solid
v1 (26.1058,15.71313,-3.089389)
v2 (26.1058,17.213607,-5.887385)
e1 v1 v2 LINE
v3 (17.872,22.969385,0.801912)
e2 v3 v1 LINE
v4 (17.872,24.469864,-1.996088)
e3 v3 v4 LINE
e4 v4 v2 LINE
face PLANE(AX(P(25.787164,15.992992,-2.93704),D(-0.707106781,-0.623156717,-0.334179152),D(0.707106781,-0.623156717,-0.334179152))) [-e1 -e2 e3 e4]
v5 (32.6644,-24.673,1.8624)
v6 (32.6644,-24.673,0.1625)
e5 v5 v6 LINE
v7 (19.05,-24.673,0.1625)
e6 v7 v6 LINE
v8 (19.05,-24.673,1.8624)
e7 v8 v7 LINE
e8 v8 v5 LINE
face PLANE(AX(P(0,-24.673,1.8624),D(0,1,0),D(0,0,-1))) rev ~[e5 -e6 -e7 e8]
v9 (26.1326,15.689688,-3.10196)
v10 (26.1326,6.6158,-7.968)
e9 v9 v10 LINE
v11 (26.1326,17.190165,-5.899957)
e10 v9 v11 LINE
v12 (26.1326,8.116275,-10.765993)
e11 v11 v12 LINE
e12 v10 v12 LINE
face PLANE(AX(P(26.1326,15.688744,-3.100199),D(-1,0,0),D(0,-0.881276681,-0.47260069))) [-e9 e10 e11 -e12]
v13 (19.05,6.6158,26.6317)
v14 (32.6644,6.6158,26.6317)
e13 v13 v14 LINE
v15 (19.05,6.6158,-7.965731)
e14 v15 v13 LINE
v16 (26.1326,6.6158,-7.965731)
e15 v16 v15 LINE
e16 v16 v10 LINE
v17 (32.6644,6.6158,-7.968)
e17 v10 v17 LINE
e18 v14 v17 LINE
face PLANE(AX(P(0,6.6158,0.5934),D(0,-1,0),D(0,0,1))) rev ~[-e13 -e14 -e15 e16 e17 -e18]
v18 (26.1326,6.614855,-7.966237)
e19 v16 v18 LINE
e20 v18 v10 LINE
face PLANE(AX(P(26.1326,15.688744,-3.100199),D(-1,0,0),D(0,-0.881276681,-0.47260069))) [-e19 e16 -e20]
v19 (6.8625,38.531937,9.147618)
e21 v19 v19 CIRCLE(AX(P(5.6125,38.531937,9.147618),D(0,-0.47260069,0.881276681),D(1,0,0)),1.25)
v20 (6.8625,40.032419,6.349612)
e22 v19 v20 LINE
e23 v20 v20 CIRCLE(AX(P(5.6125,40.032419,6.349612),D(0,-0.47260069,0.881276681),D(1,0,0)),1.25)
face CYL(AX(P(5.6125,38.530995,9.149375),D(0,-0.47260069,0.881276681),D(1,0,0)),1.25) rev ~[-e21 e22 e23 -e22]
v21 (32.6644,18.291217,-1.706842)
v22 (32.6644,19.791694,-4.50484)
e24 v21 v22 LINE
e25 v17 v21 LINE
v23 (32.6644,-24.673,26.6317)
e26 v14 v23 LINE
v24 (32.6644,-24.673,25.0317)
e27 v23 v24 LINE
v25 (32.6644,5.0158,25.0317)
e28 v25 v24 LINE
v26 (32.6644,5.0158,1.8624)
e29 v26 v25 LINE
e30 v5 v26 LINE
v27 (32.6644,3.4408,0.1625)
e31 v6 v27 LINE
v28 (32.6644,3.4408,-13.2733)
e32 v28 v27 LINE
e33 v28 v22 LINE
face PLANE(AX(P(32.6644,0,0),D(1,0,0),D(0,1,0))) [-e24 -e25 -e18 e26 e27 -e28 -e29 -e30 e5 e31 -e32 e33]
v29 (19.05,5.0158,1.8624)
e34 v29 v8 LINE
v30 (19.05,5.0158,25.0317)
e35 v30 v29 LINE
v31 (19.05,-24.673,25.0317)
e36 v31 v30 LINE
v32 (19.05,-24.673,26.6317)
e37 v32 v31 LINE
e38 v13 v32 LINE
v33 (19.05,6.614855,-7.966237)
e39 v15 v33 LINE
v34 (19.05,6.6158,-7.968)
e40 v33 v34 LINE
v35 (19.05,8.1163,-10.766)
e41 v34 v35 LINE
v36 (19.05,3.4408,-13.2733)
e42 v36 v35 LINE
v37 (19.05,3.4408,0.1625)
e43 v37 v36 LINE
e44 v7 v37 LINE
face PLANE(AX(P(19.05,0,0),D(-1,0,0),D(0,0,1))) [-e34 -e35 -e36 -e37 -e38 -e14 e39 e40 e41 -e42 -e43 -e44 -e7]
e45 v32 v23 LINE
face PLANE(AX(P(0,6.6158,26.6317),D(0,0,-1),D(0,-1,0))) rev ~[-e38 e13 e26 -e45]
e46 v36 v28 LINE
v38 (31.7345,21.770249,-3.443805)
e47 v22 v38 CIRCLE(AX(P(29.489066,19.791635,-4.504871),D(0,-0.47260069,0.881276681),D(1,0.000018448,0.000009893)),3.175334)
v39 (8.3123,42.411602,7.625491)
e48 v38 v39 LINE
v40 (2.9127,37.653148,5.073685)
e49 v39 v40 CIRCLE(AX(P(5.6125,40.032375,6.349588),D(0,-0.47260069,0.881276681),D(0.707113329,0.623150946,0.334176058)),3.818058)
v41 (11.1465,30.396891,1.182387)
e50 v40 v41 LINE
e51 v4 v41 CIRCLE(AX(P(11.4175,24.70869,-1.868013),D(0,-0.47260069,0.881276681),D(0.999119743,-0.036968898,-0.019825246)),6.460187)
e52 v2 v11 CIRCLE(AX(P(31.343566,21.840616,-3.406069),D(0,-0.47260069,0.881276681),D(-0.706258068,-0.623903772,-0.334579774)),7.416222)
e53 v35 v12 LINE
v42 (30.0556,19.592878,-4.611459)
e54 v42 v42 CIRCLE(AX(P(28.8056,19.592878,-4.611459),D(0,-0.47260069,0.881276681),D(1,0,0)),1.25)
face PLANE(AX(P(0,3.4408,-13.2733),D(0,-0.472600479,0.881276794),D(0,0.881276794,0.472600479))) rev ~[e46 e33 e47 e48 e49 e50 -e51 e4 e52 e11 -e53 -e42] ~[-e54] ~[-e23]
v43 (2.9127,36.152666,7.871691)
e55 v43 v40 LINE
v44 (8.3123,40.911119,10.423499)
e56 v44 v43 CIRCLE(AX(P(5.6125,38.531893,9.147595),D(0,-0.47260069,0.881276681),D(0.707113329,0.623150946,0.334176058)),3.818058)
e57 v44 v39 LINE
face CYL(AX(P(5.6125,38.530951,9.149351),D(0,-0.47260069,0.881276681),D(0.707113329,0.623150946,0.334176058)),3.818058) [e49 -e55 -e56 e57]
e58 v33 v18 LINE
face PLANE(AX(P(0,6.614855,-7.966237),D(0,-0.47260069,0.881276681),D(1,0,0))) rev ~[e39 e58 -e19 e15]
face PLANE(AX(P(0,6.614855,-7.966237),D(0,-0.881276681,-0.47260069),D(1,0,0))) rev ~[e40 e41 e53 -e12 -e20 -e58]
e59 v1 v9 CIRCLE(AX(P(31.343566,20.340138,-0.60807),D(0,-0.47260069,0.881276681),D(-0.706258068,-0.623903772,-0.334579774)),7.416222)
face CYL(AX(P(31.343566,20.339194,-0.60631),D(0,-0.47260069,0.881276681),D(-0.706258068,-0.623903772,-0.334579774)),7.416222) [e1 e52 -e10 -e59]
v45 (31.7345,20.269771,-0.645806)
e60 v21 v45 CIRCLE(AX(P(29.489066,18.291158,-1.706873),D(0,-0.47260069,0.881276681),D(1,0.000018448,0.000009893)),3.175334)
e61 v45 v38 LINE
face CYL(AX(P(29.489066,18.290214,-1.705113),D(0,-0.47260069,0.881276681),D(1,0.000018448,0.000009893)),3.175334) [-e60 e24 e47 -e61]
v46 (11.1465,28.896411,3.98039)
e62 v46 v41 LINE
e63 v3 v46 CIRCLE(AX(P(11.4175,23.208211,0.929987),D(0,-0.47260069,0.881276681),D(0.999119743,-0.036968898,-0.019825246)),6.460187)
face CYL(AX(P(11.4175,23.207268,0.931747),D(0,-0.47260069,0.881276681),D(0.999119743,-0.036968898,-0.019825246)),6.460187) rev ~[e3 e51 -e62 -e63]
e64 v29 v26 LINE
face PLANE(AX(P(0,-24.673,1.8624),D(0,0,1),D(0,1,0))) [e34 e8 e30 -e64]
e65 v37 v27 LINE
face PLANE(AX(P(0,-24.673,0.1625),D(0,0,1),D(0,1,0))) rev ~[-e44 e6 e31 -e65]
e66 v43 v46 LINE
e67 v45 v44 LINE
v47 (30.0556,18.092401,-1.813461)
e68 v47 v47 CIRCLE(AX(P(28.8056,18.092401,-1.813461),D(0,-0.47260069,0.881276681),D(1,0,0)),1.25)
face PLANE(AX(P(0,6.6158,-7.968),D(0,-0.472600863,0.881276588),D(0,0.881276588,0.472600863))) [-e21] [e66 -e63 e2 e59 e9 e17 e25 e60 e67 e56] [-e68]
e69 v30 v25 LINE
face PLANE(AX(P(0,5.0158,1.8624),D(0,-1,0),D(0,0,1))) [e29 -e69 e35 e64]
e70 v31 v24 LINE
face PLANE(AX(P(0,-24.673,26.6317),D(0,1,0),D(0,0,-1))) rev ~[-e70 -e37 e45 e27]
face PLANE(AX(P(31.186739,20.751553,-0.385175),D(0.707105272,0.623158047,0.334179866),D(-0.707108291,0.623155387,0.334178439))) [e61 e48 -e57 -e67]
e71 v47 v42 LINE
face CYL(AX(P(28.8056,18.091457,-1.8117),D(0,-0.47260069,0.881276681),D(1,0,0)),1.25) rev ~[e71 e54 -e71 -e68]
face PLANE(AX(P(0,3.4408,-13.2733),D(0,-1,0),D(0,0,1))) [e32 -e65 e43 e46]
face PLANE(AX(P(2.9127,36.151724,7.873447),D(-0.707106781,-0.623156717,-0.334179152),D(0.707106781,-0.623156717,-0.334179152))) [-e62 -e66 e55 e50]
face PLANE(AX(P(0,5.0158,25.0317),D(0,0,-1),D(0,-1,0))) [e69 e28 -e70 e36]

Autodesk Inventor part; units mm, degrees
ref_plane "YZ Plane" through (0, 0, 0) normal (1, 0, 0) x (0, 1, 0)
ref_plane "XZ Plane" through (0, 0, 0) normal (0, 1, 0) x (-1, 0, 0)
ref_plane "XY Plane" through (0, 0, 0) normal (0, 0, 1) x (1, 0, 0)
sketch "Sketch1" plane through (0, 0, 0) normal (1, 0, 0) x (0, 1, 0)
  line L0 (6.6158, 26.6317) -> (-24.673, 26.6317)
  line L1 (6.6158, 0.5934) -> (6.6158, 26.6317)
  line L2 (5.0158, 25.0317) -> (-24.673, 25.0317)
  line L3 (-24.673, 1.8624) -> (5.0158, 1.8624)
  line L4 (5.0158, 1.8624) -> (5.0158, 25.0317)
  line L5 (-24.673, 26.6317) -> (-24.673, 25.0317)
  line L6 (-24.673, 1.8624) -> (-24.673, 0.1625)
  line L7 (-24.6286, 24.997) -> (4.9714, 24.997) construction
  line L8 (4.9714, 24.997) -> (4.9714, 1.897) construction
  line L9 (4.9714, 1.897) -> (-24.6286, 1.897) construction
  line L10 (-24.6286, 1.897) -> (-24.6286, 24.997) construction
  line L11 (-24.6286, 1.897) -> (-24.6286, 1.8624) construction
  line L12 (-24.6286, 24.997) -> (-24.6286, 25.0317) construction
  line L13 (4.9714, 2.1686) -> (16.2714, -18.903) construction
  line L14 (4.0247, -13.8964) -> (20.8987, -4.8474)
  line L15 (3.4408, -13.2733) -> (44.9775, 9.0015)
  line L16 (3.4408, -13.2733) -> (3.4408, 0.1625)
  line L17 (6.6158, 0.5934) -> (6.6158, -7.968)
  line L18 (6.6158, -7.968) -> (43.477, 11.7995)
  line L19 (43.477, 11.7995) -> (44.9775, 9.0015)
  line L20 (-24.673, 0.1625) -> (3.4408, 0.1625)
  line L21 (6.6158, 13.8186) -> (15.6898, -3.1019) construction
  point P0 (0, 0)
  dimension "d2" = 1.6
  dimension "d3" = 23.1693
  dimension "d5" = 29.6888
  dimension "d6" = 29.6
  dimension "d7" = 23.1
  dimension "d8" = 0.0444
  dimension "d9" = 11.3
  dimension "d10" = 20.8
  dimension "d11" = 10.2
  dimension "d15" = 3.175
  dimension "d22" = 4
  dimension "d23" = 3.175
  dimension "d28" = 19.2
extrude "Extrusion1" add sketch "Sketch1" along normal blind 32.6644
sketch "Sketch2" plane through (0, 6.6158, -7.968) normal (0, -0.4726007, 0.8812767) x (1, 0, 0)
  circle A0 centre (17.209, 24.6192) radius 16.4
  circle A1 centre (28.8056, 13.0227) radius 1.25
  circle A2 centre (5.6125, 36.2158) radius 1.25
  line L0 (28.8056, 13.0227) -> (5.6125, 36.2158) construction
  line L1 (0, 41.827) -> (32.6644, 41.827) projected
  line L2 (0, 3.3414) -> (38.1, 3.3414) construction
  line L3 (0, 41.827) -> (0, 0) construction
  circle A3 centre (11.5522, 18.9624) radius 1.4362 construction
  line L4 (11.5522, 18.9624) -> (17.209, 24.6192) construction
  line L5 (0, 10.2963) -> (32.6644, 10.2963) construction
  line L6 (32.6644, 41.827) -> (32.6644, 0) construction
  circle A4 centre (17.209, 24.6192) radius 13.95 construction
  line L7 (28.8056, 13.0227) -> (5.6125, 36.2158) construction
  line L8 (31.7345, 15.4934) -> (8.3123, 38.9155)
  line L9 (2.9127, 33.516) -> (26.1058, 10.3229)
  arc A5 (26.1058, 10.3229) -> (26.1326, 10.2963) centre (28.8056, 13.0227) ccw
  arc A6 (8.3123, 38.9155) -> (2.9127, 33.516) centre (5.6125, 36.2158) ccw
  line L10 (32.6644, 13.2483) -> (32.6644, 0)
  line L11 (0, 0) -> (32.6644, 0) projected
  line L12 (26.1326, 10.2963) -> (26.1326, 0)
  arc A7 (32.6644, 13.2483) -> (31.7345, 15.4934) centre (29.4894, 13.2483) ccw
  line L13 (0, 0) -> (0, 41.827)
  line L14 (32.6644, -5.3054) -> (32.6644, 41.827) projected
  arc A8 (17.872, 18.5567) -> (11.1465, 25.2822) centre (11.4175, 18.8277) ccw
  point P0 (0, -2.0647)
  point P1 (0, 3.3414)
  point P2 (0, 10.2963)
  point P3 (31.1867, 16.0411)
  point P4 (32.6644, 19.1336)
  point P5 (32.6644, 13.2483)
  point P6 (15.9856, 23.3958)
  dimension "d16" = 32.8
  dimension "d17" = 2.5
  dimension "d18" = 2.5
  dimension "d19" = 45
  dimension "d26" = 8
  dimension "d27" = 15.621
  dimension "d29" = 27.9
  dimension "d30" = 3.175
extrude "Extrusion2" cut sketch "Sketch2" against normal blind 25.4 contours A2 A0 | A0 A2 | A1 A0 | A0 A1
extrude "Extrusion3" cut sketch "Sketch2" against normal blind 25.4 contours L14 A0 L8 | A0 L8 A6 L9 A5 L12 L11 L13 L1 L14 | L14 A7 L8 A0 | L9 A0 | A8 L9
sketch "Sketch5" plane through (0, 0, 0) normal (-1, 0, 0) x (0, 0, 1)
  line L0 (-7.968, 6.6158) -> (-10.766, 8.1163) projected
  line L1 (-13.2733, 3.4408) -> (-10.766, 8.1163) projected
  line L2 (0.1625, 3.4408) -> (-13.2733, 3.4408) projected
  line L3 (0.1625, -24.673) -> (0.1625, 3.4408) projected
  line L4 (1.8624, -24.673) -> (0.1625, -24.673) projected
  line L5 (1.8624, 5.0158) -> (1.8624, -24.673) projected
  line L6 (25.0317, 5.0158) -> (1.8624, 5.0158) projected
  line L7 (25.0317, -24.673) -> (25.0317, 5.0158) projected
  line L8 (26.6317, -24.673) -> (25.0317, -24.673) projected
  line L9 (26.6317, 6.6158) -> (26.6317, -24.673) projected
  line L10 (-7.968, 6.6158) -> (26.6317, 6.6158) projected
  point P0 (0, 0)
extrude "Extrusion4" cut sketch "Sketch5" against normal blind 19.05
properties part number "Motor Mount"
